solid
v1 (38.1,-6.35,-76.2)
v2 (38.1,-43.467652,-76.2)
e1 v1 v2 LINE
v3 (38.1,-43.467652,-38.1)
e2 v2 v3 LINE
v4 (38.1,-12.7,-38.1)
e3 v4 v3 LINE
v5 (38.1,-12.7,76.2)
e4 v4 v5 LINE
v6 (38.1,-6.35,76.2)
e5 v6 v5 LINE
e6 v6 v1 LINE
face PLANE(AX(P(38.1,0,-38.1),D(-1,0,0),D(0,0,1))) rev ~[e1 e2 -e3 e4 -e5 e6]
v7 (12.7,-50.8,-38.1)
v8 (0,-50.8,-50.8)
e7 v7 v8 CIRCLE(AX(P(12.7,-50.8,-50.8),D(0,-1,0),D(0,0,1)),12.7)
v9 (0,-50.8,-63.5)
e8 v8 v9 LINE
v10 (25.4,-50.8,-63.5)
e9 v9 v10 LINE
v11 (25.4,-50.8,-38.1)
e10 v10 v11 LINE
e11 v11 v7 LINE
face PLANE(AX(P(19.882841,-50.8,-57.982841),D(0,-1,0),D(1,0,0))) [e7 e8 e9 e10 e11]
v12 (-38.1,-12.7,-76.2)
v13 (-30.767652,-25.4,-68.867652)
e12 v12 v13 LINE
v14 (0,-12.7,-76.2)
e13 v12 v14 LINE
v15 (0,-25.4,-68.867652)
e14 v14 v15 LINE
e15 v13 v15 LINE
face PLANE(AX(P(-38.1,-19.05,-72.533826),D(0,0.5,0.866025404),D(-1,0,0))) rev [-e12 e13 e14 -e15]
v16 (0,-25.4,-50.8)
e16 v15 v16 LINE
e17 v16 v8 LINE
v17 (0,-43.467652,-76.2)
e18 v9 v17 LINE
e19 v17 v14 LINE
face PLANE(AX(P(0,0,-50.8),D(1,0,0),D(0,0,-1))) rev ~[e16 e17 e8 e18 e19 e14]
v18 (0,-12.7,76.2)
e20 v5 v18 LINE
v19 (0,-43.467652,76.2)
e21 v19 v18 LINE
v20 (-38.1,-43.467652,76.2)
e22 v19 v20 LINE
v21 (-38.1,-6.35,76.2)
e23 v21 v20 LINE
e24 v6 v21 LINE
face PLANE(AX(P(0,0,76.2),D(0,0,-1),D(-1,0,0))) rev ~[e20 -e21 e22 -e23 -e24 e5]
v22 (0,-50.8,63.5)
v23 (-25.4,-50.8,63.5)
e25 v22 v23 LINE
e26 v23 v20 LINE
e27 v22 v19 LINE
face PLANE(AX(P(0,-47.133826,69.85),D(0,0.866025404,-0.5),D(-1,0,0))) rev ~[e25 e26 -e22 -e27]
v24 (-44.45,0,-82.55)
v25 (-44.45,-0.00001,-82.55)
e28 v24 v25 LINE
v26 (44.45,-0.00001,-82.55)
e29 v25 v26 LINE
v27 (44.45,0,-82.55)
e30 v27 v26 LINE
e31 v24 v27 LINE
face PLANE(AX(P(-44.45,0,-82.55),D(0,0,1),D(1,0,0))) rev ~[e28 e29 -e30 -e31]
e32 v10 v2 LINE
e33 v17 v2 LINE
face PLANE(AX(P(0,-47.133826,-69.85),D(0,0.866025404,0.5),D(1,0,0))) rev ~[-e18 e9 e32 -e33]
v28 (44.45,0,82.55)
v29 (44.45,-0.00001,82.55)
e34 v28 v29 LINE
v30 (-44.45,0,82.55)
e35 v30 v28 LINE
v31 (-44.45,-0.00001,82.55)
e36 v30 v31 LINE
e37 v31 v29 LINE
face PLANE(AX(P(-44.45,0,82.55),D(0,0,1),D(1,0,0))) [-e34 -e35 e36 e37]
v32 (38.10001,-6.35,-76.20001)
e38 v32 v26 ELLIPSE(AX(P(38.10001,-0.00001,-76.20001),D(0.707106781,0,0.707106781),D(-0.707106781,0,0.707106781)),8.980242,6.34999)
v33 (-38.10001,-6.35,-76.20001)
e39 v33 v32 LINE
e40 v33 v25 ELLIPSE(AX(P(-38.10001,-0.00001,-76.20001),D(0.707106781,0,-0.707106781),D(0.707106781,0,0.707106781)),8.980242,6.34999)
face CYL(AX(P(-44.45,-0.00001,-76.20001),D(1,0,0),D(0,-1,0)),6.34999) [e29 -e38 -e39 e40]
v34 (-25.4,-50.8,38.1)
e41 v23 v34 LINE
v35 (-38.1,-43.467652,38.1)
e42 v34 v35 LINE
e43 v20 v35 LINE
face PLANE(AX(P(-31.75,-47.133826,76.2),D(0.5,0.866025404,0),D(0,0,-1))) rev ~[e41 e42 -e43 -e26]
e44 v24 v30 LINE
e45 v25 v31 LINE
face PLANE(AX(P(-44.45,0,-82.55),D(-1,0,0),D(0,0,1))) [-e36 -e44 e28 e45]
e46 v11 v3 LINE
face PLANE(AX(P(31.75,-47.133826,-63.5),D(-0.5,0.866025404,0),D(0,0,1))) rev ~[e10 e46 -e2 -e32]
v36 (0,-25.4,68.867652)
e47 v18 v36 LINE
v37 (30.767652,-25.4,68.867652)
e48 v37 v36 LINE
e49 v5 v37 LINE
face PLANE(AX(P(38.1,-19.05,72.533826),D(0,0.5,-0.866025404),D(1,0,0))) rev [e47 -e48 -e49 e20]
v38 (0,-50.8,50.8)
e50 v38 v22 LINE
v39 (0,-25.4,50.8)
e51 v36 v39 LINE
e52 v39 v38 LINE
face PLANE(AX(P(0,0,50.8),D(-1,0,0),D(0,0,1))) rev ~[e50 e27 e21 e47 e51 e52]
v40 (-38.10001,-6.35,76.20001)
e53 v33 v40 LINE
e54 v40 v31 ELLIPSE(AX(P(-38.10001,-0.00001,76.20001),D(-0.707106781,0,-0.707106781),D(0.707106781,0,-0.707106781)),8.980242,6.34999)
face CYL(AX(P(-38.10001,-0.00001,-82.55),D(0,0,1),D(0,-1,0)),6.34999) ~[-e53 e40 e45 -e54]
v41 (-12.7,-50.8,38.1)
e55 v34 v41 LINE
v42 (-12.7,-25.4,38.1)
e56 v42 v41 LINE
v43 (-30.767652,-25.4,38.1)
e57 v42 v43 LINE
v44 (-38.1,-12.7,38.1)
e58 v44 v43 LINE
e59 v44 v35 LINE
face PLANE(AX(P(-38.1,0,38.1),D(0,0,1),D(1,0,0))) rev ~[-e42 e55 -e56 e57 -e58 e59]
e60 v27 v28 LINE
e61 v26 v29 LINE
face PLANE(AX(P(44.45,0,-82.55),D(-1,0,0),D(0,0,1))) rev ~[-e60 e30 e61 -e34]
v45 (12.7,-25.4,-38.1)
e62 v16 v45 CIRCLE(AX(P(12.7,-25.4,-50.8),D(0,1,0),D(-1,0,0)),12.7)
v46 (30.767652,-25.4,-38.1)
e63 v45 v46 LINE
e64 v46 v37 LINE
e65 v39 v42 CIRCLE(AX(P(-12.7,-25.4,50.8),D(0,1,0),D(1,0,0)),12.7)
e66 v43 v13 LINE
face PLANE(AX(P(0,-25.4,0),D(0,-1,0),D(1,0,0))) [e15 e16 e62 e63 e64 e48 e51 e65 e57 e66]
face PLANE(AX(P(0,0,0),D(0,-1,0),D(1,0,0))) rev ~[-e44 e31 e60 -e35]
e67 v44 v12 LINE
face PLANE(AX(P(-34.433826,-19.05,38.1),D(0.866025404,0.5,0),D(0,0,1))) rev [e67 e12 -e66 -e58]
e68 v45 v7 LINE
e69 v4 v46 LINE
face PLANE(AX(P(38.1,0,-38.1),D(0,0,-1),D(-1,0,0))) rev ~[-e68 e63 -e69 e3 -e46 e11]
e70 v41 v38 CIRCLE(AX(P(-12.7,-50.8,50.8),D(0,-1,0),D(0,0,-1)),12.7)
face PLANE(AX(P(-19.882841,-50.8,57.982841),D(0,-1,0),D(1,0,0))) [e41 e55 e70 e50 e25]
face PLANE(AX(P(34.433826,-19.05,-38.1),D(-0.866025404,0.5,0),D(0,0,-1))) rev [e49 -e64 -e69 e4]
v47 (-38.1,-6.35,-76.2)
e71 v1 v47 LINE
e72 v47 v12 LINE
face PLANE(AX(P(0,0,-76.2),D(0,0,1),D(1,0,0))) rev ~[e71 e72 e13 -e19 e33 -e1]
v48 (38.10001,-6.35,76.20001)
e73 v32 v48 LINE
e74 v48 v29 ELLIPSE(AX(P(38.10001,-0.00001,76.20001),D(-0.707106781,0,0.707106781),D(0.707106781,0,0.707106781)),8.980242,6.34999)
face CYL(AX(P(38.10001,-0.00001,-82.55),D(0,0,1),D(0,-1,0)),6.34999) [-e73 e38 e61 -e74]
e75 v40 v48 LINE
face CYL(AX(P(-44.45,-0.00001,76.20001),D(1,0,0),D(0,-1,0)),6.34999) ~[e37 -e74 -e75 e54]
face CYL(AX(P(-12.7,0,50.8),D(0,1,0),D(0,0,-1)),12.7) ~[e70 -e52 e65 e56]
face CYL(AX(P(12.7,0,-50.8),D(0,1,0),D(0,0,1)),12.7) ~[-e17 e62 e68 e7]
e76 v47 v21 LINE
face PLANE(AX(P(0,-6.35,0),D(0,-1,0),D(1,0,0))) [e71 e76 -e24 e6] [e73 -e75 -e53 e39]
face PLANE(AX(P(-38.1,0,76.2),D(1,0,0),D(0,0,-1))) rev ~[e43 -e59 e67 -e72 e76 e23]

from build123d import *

# Parameters (mm, degrees)
F0_W       = 88.9
F0_H       = 165.1
F1_DEPTH   = 6.35
F2_DEPTH   = 25.4
F3_DEPTH   = 50.8
F4_SIZE2   = 7.3323484187
F4_SIZE    = 12.7
F4_2_SIZE2 = 7.3323484187
F4_2_SIZE  = 12.7
F5_R       = 6.34999
F6_SIZE2   = 7.3323484187
F6_SIZE    = 12.7
F7_SIZE2   = 7.3323484187
F7_SIZE    = 12.7


# Not quite as in the source:
# - a fillet or chamfer is up to 0.001 mm smaller than in the source, because OpenCascade refuses the exact size


with BuildPart() as f1:
    # F0 (on Front) → F1 (new body)
    with BuildSketch(Plane.XZ):
        Rectangle(F0_W, F0_H)
        Polygon((-38.1, 38.1), (-38.1, 76.2), (0, 76.2), (38.1, 76.2), (38.1, -38.1), (38.1, -76.2), (0, -76.2), (-38.1, -76.2), align=None, mode=Mode.SUBTRACT)
    extrude(amount=F1_DEPTH)

    # F0 (on Front) → F2 (join)
    with BuildSketch(Plane.XZ):
        with BuildLine():
            Line((38.1, 76.2), (0, 76.2))
            Line((0, 76.2), (0, 50.8))
            ThreePointArc((0, 50.8), (-3.7197438789, 41.8197438789), (-12.7, 38.1))
            Line((-12.7, 38.1), (-38.1, 38.1))
            Line((-38.1, 38.1), (-38.1, -76.2))
            Line((-38.1, -76.2), (0, -76.2))
            Line((0, -76.2), (0, -50.8))
            ThreePointArc((0, -50.8), (3.7197438789, -41.8197438789), (12.7, -38.1))
            Line((12.7, -38.1), (38.1, -38.1))
            Line((38.1, -38.1), (38.1, 76.2))
        make_face()
    extrude(amount=F2_DEPTH)

    # F0 (on Front) → F3 (join)
    with BuildSketch(Plane.XZ):
        with BuildLine():
            Line((0, 76.2), (-38.1, 76.2))
            Line((-38.1, 76.2), (-38.1, 38.1))
            Line((-38.1, 38.1), (-12.7, 38.1))
            ThreePointArc((-12.7, 38.1), (-3.7197438789, 41.8197438789), (0, 50.8))
            Line((0, 50.8), (0, 76.2))
        make_face()
        with BuildLine():
            Line((38.1, -76.2), (38.1, -38.1))
            Line((38.1, -38.1), (12.7, -38.1))
            ThreePointArc((12.7, -38.1), (3.7197438789, -41.8197438789), (0, -50.8))
            Line((0, -50.8), (0, -76.2))
            Line((0, -76.2), (38.1, -76.2))
        make_face()
    extrude(amount=F3_DEPTH)

    # F4
    f4_edges = [f1.edges().sort_by_distance(p)[0] for p in [
        (-38.1, -50.8, 57.15),
        (-19.05, -50.8, 76.2),
    ]]
    f4_side = f1.faces().sort_by_distance((-19.446042, -50.8, 57.546042))[0]
    chamfer(f4_edges, length=F4_SIZE, length2=F4_SIZE2, reference=f4_side)

    # F4#2
    f4_2_edges = [f1.edges().sort_by_distance(p)[0] for p in [
        (19.05, -50.8, -76.2),
    ]]
    f4_2_side = f1.faces().sort_by_distance((19.446042, -50.8, -57.546042))[0]
    chamfer(f4_2_edges, length=F4_2_SIZE, length2=F4_2_SIZE2, reference=f4_2_side)

    # F5 (radius 6.35 in the source; OpenCascade refuses exactly that, so slightly less here)
    f5_edges = [f1.edges().sort_by_distance(p)[0] for p in [
        (44.45, -6.35, 0),
        (0, -6.35, 82.55),
        (-44.45, -6.35, 0),
        (0, -6.35, -82.55),
    ]]
    fillet(f5_edges, radius=F5_R)

    # F6
    f6_edges = [f1.edges().sort_by_distance(p)[0] for p in [
        (38.1, -25.4, 19.05),
        (19.05, -25.4, 76.2),
        (-38.1, -25.4, -19.05),
        (-19.05, -25.4, -76.2),
    ]]
    chamfer(f6_edges, length=F6_SIZE, length2=F6_SIZE2)

    # F7
    f7_edges = [f1.edges().sort_by_distance(p)[0] for p in [
        (38.1, -50.8, -50.8),
    ]]
    f7_side = f1.faces().sort_by_distance((19.651409, -50.8, -51.165864))[0]
    chamfer(f7_edges, length=F7_SIZE, length2=F7_SIZE2, reference=f7_side)


solid = f1.part
